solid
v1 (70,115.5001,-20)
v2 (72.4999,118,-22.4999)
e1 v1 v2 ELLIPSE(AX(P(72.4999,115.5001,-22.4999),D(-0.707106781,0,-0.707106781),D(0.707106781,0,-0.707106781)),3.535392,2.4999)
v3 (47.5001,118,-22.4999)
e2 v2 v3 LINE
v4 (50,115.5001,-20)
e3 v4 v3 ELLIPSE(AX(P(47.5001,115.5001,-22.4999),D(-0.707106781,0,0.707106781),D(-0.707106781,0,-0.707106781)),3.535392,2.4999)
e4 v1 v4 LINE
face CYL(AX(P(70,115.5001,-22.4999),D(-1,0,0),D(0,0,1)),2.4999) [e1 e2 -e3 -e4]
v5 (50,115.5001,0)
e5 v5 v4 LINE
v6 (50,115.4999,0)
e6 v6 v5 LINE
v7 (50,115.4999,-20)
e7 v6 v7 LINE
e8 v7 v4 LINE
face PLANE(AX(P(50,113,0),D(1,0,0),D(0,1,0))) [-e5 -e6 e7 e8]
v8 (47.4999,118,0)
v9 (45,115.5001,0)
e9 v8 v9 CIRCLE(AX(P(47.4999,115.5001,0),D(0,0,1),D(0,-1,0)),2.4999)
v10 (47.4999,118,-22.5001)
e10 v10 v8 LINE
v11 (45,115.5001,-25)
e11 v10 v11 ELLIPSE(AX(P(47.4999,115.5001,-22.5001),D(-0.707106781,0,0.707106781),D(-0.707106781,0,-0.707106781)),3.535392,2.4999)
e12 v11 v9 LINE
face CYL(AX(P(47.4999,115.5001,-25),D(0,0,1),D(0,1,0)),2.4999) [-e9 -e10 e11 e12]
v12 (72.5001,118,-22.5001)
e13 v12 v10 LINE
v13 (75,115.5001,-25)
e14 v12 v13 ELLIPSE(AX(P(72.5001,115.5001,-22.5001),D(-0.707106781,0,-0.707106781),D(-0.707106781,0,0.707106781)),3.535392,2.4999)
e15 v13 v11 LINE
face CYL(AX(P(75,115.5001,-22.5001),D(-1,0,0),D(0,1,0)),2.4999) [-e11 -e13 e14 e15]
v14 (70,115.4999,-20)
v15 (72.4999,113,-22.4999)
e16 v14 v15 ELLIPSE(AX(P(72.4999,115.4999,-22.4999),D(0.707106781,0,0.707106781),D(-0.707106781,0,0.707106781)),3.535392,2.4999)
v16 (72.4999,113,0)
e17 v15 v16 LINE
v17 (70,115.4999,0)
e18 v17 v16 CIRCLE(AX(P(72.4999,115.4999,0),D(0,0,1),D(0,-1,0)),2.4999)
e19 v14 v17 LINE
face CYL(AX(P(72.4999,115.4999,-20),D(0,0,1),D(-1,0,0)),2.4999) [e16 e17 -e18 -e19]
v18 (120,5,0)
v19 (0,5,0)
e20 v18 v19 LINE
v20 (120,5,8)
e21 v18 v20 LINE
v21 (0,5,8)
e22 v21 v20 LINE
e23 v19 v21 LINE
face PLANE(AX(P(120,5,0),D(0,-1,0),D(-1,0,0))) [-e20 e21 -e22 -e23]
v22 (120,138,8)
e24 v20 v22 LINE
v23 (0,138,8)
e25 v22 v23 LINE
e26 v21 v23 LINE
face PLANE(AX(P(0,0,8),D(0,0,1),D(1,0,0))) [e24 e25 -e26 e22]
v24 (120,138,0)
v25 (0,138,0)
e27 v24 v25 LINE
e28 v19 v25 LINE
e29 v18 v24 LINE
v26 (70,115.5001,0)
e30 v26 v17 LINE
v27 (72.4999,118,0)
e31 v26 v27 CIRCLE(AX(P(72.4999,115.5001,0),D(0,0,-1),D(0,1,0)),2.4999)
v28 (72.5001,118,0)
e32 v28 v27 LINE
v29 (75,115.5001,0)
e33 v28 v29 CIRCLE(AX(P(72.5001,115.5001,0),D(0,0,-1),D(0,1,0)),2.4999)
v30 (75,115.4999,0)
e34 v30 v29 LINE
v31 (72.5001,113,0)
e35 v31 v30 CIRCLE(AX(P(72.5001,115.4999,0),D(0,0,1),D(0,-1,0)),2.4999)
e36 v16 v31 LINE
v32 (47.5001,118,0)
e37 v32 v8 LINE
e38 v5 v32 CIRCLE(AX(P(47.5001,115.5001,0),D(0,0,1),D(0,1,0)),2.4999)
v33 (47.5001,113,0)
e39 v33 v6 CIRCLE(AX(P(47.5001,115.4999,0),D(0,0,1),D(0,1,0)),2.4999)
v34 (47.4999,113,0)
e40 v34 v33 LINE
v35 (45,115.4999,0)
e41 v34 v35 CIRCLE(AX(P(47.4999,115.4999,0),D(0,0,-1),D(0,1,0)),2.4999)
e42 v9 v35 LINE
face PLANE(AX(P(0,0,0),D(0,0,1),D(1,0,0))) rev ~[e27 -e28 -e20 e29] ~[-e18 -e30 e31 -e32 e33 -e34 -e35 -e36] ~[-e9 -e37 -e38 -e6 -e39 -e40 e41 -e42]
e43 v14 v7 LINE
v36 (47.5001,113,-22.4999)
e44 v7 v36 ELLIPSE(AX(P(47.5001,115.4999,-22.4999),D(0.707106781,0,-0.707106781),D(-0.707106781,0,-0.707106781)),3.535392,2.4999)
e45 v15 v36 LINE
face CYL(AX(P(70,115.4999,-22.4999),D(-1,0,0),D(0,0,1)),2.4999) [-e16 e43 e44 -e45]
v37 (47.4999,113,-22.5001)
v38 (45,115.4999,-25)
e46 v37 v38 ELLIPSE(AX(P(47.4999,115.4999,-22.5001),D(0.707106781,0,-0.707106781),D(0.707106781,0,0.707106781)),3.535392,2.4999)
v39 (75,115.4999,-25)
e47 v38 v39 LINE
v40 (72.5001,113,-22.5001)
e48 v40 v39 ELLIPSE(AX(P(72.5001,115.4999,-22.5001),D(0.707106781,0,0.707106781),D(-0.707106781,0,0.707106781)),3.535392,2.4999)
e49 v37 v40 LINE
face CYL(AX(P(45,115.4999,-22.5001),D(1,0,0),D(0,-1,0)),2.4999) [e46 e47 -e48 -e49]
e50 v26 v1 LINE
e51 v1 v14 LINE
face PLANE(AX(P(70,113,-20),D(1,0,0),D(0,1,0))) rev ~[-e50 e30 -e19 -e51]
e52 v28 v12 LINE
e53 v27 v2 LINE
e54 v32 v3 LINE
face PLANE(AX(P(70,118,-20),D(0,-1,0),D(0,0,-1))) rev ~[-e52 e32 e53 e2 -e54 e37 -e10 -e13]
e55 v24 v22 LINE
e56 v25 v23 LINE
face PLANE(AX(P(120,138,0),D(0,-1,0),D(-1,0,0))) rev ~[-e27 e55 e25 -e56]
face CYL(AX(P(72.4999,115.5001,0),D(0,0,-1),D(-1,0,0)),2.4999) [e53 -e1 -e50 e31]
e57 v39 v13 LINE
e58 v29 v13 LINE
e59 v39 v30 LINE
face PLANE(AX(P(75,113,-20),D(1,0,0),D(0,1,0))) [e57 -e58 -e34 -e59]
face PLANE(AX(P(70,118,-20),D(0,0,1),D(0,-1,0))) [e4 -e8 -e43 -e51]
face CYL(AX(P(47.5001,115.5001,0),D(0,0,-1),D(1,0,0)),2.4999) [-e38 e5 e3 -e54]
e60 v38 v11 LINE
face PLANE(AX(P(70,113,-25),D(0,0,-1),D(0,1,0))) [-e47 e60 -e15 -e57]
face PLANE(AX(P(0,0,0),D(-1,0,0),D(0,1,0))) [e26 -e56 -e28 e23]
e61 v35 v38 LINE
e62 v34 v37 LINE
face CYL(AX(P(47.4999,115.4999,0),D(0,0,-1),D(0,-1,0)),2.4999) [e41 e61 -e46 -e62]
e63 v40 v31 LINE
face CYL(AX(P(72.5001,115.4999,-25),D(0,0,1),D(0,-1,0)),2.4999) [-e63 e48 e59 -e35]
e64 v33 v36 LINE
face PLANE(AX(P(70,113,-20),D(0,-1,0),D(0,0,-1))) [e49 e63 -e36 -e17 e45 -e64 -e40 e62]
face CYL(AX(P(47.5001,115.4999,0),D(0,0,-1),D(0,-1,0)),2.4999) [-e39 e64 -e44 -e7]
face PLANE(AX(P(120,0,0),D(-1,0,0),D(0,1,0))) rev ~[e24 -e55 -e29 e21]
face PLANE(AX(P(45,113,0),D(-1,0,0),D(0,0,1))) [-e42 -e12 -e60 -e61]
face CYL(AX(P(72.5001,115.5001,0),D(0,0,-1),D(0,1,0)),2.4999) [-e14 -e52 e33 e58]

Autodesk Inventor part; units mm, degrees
ref_plane "YZ Plane" through (0, 0, 0) normal (1, 0, 0) x (0, 1, 0)
ref_plane "XZ Plane" through (0, 0, 0) normal (0, 1, 0) x (-1, 0, 0)
ref_plane "XY Plane" through (0, 0, 0) normal (0, 0, 1) x (1, 0, 0)
sketch "Skizze1" plane through (0, 0, 0) normal (0, 0, 1) x (1, 0, 0)
  line L0 (-24, 0) -> (144, 0) projected
  line L1 (0, -27.6) -> (0, 165.6) projected
  line L2 (0, 0) -> (120, 0)
  line L3 (120, 0) -> (120, 138)
  line L4 (120, 138) -> (0, 138)
  line L5 (0, 138) -> (0, 0)
  point P0 (0, 138)
  dimension "d0" = 120
  dimension "d1" = 138
extrude "Extrusion1" add sketch "Skizze1" along normal blind 8
sketch "Skizze2" plane through (0, 0, 0) normal (0, 0, -1) x (-1, 0, 0)
  line L0 (-75, 118) -> (-70, 118)
  line L1 (-70, 118) -> (-70, 113)
  line L2 (-70, 113) -> (-75, 113)
  line L3 (-75, 113) -> (-75, 118)
  line L4 (-50, 118) -> (-45, 118)
  line L5 (-45, 118) -> (-45, 113)
  line L6 (-45, 113) -> (-50, 113)
  line L7 (-50, 113) -> (-50, 118)
  line L8 (0, 138) -> (0, 0) projected
  line L9 (-120, 0) -> (-120, 138) projected
  line L10 (-120, 138) -> (0, 138) projected
  dimension "d4" = 5
  dimension "d5" = 5
  dimension "d6" = 5
  dimension "d7" = 5
  dimension "d8" = 45
  dimension "d9" = 45
  dimension "d10" = 20
  dimension "d11" = 20
extrude "Extrusion2" add sketch "Skizze2" along normal blind 20
sketch "Skizze3" plane through (0, 0, -20) normal (0, 0, -1) x (-1, 0, 0)
  line L0 (-70, 118) -> (-75, 118) projected
  line L1 (-70, 113) -> (-70, 118) projected
  line L2 (-75, 118) -> (-70, 118)
  line L3 (-70, 118) -> (-70, 113)
  line L4 (-70, 113) -> (-75, 113)
  line L5 (-75, 113) -> (-75, 118)
  point P0 (0, 0)
extrude "Extrusion3" add sketch "Skizze3" along normal blind 5
sketch "Skizze4" plane through (70, 113, 0) normal (-1, 0, 0) x (0, 0, 1)
  line L0 (0, 5) -> (-25, 5) projected
  line L1 (-20, 5) -> (-20, 0) projected
  line L2 (-25, 5) -> (-20, 5)
  line L3 (-20, 5) -> (-20, 0)
  line L4 (-20, 0) -> (-25, 0)
  line L5 (-25, 0) -> (-25, 5)
  point P0 (0, -113)
extrude "Extrusion4" add sketch "Skizze4" along normal blind 25
fillet "Rundung1" radius 2.5 12 edges at (70, 113, -10) (75, 113, -12.5) (60, 113, -20) (60, 113, -25) (50, 113, -10) (45, 113, -12.5) (60, 118, -25) (70, 118, -10) (75, 118, -12.5) (60, 118, -20) (45, 118, -12.5) (50, 118, -10)
sketch "Skizze7" plane through (0, 0, 0) normal (0, 0, -1) x (-1, 0, 0)
  point P0 (0, 0)
sketch "Skizze8" plane through (0, 0, 0) normal (0, 0, -1) x (-1, 0, 0)
  line L0 (-120, 0) -> (-120, 138) projected
  line L1 (0, 138) -> (0, 0) projected
  line L2 (-120, 5) -> (0, 5)
  line L3 (0, 5) -> (0, 0)
  line L4 (0, 0) -> (-120, 0)
  line L5 (-120, 0) -> (-120, 5)
  point P0 (0, 5)
  dimension "d25" = 5
extrude "Extrusion7" cut sketch "Skizze8" against normal blind 10
properties part number "DeckelMess" material "Acetalharz, Schwarz"
